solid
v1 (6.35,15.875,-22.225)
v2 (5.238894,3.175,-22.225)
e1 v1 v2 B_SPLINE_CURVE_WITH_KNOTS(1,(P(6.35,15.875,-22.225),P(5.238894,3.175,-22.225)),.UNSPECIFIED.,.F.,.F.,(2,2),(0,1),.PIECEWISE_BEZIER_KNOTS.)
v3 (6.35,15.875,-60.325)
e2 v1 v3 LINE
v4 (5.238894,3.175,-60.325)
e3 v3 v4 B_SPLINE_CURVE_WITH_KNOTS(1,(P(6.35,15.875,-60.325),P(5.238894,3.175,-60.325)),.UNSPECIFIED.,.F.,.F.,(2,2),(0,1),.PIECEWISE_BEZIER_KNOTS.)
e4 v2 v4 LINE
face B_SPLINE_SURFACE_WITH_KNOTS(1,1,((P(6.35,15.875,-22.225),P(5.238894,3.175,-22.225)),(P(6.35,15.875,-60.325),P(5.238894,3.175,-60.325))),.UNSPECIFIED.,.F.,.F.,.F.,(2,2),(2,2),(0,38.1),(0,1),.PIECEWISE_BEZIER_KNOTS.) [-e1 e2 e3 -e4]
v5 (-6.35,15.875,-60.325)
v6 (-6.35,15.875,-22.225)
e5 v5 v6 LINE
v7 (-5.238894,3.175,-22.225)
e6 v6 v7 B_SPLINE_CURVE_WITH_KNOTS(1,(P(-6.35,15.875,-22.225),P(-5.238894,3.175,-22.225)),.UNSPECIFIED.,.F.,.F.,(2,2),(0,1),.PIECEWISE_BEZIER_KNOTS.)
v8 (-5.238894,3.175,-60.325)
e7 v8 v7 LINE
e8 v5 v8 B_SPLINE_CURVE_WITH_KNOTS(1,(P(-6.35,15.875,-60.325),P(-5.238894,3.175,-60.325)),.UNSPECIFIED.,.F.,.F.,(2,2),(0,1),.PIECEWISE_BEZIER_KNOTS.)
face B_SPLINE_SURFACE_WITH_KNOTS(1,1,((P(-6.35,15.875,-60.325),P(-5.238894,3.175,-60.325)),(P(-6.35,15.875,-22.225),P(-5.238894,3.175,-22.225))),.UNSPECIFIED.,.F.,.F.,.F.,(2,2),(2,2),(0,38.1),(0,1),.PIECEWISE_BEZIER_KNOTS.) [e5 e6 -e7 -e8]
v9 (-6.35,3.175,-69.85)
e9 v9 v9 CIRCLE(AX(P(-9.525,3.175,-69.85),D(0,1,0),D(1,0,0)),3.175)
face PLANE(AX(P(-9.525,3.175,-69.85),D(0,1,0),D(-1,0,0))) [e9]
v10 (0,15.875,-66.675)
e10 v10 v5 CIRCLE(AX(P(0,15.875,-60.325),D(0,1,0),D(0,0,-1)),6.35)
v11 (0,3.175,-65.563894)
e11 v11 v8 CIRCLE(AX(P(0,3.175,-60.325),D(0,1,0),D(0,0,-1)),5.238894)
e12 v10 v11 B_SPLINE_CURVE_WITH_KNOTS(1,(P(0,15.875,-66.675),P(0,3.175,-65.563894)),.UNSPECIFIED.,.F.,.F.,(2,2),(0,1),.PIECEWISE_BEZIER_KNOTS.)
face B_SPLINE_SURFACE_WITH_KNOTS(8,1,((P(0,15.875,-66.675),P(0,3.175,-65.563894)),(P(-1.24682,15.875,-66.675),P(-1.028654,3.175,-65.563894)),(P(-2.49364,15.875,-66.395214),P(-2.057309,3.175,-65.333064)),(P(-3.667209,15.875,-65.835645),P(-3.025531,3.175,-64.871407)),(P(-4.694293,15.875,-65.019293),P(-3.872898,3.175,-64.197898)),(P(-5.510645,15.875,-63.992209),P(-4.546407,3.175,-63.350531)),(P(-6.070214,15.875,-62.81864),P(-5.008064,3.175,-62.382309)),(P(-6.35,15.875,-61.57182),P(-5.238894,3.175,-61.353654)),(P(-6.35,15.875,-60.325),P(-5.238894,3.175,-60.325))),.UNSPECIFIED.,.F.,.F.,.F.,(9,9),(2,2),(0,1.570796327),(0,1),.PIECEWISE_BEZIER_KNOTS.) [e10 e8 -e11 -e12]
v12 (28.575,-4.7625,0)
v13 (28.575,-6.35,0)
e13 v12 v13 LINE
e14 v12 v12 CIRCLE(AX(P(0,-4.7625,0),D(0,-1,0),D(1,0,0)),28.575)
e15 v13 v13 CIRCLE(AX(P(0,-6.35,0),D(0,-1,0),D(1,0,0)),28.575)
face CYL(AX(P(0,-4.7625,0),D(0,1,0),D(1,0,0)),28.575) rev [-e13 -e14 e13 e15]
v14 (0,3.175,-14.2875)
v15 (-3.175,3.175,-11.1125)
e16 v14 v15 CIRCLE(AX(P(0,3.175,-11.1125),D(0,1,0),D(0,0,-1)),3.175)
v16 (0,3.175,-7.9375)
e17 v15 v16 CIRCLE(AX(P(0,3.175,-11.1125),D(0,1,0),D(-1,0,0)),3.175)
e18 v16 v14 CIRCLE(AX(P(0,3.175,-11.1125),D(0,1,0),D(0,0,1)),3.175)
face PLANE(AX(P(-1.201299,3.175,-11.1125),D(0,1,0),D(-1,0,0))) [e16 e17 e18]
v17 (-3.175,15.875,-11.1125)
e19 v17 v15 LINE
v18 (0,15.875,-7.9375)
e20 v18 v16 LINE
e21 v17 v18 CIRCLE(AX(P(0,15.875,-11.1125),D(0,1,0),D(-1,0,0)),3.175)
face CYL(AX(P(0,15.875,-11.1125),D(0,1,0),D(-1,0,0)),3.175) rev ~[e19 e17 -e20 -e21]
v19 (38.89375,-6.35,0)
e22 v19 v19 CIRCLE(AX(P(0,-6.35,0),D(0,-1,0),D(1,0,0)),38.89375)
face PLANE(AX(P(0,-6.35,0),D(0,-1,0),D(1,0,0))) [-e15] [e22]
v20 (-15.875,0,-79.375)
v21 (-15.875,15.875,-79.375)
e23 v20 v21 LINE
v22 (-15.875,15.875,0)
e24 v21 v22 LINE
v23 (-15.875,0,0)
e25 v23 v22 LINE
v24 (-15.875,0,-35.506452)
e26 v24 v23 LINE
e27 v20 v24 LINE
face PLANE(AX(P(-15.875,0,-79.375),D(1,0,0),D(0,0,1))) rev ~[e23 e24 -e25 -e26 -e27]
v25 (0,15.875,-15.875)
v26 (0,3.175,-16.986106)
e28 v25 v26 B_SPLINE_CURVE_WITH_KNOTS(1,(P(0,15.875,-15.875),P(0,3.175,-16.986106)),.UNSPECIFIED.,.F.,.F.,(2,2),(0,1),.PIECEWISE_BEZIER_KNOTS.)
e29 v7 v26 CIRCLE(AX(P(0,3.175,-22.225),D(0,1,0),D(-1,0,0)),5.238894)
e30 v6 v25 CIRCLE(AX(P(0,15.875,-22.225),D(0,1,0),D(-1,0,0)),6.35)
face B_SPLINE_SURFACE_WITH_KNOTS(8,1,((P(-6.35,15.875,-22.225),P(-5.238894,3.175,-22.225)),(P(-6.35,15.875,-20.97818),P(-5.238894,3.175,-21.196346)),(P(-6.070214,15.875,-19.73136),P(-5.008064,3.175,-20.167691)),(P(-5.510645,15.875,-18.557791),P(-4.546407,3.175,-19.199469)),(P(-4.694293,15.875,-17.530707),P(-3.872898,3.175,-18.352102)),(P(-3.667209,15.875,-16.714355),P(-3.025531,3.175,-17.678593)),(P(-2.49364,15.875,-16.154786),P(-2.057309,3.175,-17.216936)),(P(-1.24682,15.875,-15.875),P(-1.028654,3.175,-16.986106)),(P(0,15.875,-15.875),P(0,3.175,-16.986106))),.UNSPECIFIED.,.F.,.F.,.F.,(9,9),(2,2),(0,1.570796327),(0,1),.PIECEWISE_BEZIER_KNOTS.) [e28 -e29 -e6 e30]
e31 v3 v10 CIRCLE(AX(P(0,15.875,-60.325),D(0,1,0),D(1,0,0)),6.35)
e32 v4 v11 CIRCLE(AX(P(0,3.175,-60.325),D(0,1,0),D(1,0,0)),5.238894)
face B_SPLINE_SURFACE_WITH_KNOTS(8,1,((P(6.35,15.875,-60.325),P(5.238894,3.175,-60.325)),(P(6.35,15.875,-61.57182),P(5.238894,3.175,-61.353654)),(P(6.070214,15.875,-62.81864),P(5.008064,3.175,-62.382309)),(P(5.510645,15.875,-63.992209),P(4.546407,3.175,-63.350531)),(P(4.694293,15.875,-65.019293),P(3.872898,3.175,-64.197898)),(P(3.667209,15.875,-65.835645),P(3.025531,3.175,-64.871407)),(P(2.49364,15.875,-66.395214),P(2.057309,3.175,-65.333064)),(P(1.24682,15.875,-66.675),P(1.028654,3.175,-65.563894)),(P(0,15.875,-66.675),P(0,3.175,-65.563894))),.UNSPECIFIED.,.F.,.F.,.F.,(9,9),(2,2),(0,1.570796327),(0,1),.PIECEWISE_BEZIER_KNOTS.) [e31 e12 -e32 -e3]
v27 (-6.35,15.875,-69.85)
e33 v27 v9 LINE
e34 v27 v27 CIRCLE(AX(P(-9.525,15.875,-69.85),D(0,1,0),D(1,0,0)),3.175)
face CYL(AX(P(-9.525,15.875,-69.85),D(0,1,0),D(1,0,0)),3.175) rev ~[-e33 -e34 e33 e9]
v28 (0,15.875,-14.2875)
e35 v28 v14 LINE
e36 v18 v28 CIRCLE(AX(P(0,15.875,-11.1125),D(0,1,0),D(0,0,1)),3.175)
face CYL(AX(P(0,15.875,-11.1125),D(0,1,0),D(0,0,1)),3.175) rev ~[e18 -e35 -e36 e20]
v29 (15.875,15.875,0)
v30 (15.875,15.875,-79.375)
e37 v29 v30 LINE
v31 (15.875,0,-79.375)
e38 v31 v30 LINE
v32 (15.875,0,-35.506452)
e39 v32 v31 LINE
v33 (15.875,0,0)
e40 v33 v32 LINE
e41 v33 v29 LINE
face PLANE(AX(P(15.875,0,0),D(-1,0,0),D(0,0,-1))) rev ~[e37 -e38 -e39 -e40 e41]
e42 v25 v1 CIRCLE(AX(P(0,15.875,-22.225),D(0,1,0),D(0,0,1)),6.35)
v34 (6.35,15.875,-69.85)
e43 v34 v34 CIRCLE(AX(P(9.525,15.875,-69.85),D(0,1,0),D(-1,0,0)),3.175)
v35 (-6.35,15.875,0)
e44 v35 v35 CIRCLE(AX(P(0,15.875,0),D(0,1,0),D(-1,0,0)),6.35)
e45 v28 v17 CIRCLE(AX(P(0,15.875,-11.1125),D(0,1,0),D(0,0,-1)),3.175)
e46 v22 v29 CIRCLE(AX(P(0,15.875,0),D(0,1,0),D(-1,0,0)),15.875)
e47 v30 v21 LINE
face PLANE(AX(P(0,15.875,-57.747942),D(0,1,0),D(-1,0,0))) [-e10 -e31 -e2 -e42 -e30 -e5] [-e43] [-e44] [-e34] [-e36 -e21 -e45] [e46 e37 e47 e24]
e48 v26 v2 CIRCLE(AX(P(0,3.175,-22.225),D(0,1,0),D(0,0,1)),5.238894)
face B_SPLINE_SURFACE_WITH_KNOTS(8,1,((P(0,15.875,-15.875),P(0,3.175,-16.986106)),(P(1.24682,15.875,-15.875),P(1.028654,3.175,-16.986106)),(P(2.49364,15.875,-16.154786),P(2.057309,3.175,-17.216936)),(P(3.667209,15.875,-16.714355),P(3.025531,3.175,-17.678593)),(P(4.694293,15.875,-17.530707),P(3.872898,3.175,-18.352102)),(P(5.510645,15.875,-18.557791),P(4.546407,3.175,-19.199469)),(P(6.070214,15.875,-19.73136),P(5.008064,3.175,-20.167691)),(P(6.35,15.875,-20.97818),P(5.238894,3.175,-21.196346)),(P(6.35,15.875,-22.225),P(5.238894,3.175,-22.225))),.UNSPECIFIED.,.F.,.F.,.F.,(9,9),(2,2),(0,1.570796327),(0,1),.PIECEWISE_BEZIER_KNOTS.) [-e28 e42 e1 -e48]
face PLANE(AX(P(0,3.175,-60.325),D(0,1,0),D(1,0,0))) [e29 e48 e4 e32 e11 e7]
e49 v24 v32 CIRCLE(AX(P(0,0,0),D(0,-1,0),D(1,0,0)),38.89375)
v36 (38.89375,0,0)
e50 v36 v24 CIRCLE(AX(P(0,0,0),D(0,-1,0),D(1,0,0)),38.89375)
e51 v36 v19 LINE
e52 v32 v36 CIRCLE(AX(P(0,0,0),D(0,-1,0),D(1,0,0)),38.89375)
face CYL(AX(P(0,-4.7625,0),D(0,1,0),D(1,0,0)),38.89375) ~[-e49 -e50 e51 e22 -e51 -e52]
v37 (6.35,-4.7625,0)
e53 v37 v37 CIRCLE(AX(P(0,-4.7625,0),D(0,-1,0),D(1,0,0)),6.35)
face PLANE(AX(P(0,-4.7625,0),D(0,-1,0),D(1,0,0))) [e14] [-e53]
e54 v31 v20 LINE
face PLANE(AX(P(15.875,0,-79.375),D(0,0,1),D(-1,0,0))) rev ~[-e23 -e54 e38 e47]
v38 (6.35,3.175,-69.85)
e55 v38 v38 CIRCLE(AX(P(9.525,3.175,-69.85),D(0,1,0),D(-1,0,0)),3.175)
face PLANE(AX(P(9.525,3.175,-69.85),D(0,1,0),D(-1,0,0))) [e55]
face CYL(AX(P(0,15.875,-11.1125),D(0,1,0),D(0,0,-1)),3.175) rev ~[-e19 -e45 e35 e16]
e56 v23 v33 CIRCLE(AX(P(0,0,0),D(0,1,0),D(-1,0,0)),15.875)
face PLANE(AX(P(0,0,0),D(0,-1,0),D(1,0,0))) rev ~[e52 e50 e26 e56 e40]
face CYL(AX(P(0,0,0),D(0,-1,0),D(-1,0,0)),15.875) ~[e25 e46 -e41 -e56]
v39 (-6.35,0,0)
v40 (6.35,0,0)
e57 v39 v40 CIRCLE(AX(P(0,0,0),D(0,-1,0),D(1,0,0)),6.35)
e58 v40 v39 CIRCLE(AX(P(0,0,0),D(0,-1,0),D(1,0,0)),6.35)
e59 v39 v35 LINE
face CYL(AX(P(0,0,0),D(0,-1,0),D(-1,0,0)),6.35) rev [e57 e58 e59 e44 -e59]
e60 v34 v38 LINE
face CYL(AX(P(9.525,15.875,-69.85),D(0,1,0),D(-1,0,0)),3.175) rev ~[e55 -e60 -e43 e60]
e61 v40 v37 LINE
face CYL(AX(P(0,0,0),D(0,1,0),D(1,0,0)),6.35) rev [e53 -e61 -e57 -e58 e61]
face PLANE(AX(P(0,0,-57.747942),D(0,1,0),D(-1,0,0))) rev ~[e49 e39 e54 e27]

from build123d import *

# Parameters (mm, degrees)
F0_R     = 38.89375
F0_R_2   = 6.35
F1_DEPTH = 4.7625
F2_R     = 38.89375
F2_R_2   = 28.575
F3_DEPTH = 1.5875
F4_R     = 6.35
F5_DEPTH = 15.875
F7_DEPTH = 12.7
F7_TAPER = 5
F8_R     = 3.175
F9_DEPTH = 12.7


with BuildPart() as f1:
    # F0 (on Front) → F1 (new body)
    with BuildSketch(Plane.XZ):
        Circle(F0_R)
        Circle(F0_R_2, mode=Mode.SUBTRACT)
    extrude(amount=F1_DEPTH)

    # F2 (on face) → F3 (join)
    with BuildSketch(Plane.XZ.offset(4.7625)):
        Circle(F2_R)
        Circle(F2_R_2, mode=Mode.SUBTRACT)
    extrude(amount=F3_DEPTH)

    # F4 (on face) → F5 (join)
    with BuildSketch(Plane(origin=(0, 0, 0), x_dir=(-1, 0, 0), z_dir=(0, 1, 0))):
        with BuildLine():
            Line((-15.875, -79.375), (15.875, -79.375))
            Line((15.875, -79.375), (15.875, -35.5064524286))
            ThreePointArc((15.875, -35.5064524286), (0, -38.89375), (-15.875, -35.5064524286))
            Line((-15.875, -35.5064524286), (-15.875, -79.375))
        make_face()
        with BuildLine():
            ThreePointArc((-15.875, -35.5064524286), (0, -38.89375), (15.875, -35.5064524286))
            Line((15.875, -35.5064524286), (15.875, 0))
            ThreePointArc((15.875, 0), (4.9e-09, -15.875), (-15.875, -9.8e-09))
            Line((-15.875, -9.8e-09), (-15.875, -35.5064524286))
        make_face()
        with BuildLine():
            ThreePointArc((-15.875, -9.8e-09), (4.9e-09, -15.875), (15.875, 0))
            ThreePointArc((15.875, 0), (-4.9e-09, 15.875), (-15.875, -9.8e-09))
        make_face()
        Circle(F4_R, mode=Mode.SUBTRACT)
    extrude(amount=F5_DEPTH)

    # F6 (on face) → F7 (cut)
    with BuildSketch(Plane(origin=(0, 15.875, 0), x_dir=(-1, 0, 0), z_dir=(0, 1, 0))):
        with BuildLine():
            ThreePointArc((-6.35, -60.325), (-4.4901280605, -64.8151280605), (0, -66.675))
            Line((0, -66.675), (0, -60.325))
            Line((0, -60.325), (-6.35, -60.325))
        make_face()
        with BuildLine():
            Line((0, -60.325), (0, -66.675))
            ThreePointArc((0, -66.675), (4.4901280605, -64.8151280605), (6.35, -60.325))
            Line((6.35, -60.325), (0, -60.325))
        make_face()
        with BuildLine():
            Line((-6.35, -60.325), (0, -60.325))
            Line((0, -60.325), (0, -53.975))
            ThreePointArc((0, -53.975), (-4.4901280605, -55.8348719395), (-6.35, -60.325))
        make_face()
        with BuildLine():
            Line((0, -53.975), (0, -60.325))
            Line((0, -60.325), (6.35, -60.325))
            ThreePointArc((6.35, -60.325), (4.4901280605, -55.8348719395), (0, -53.975))
        make_face()
        with BuildLine():
            Line((-6.35, -22.225), (-6.35, -60.325))
            ThreePointArc((-6.35, -60.325), (-4.4901280605, -55.8348719395), (0, -53.975))
            Line((0, -53.975), (0, -28.575))
            ThreePointArc((0, -28.575), (-4.4901280605, -26.7151280605), (-6.35, -22.225))
        make_face()
        with BuildLine():
            ThreePointArc((0, -53.975), (4.4901280605, -55.8348719395), (6.35, -60.325))
            Line((6.35, -60.325), (6.35, -22.225))
            ThreePointArc((6.35, -22.225), (4.4901280605, -26.7151280605), (0, -28.575))
            Line((0, -28.575), (0, -53.975))
        make_face()
        with BuildLine():
            ThreePointArc((0, -15.875), (-4.4901280605, -17.7348719395), (-6.35, -22.225))
            Line((-6.35, -22.225), (0, -22.225))
            Line((0, -22.225), (0, -15.875))
        make_face()
        with BuildLine():
            Line((0, -22.225), (-6.35, -22.225))
            ThreePointArc((-6.35, -22.225), (-4.4901280605, -26.7151280605), (0, -28.575))
            Line((0, -28.575), (0, -22.225))
        make_face()
        with BuildLine():
            ThreePointArc((0, -28.575), (4.4901280605, -26.7151280605), (6.35, -22.225))
            Line((6.35, -22.225), (0, -22.225))
            Line((0, -22.225), (0, -28.575))
        make_face()
        with BuildLine():
            Line((0, -22.225), (6.35, -22.225))
            ThreePointArc((6.35, -22.225), (4.4901280605, -17.7348719395), (0, -15.875))
            Line((0, -15.875), (0, -22.225))
        make_face()
    extrude(amount=-F7_DEPTH, taper=F7_TAPER, mode=Mode.SUBTRACT)

    # F8 (on face) → F9 (cut)
    with BuildSketch(Plane(origin=(0, 15.875, 0), x_dir=(-1, 0, 0), z_dir=(0, 1, 0))):
        with BuildLine():
            ThreePointArc((3.175, -11.1125), (2.2450640303, -8.8674359697), (0, -7.9375))
            Line((0, -7.9375), (0, -14.2875))
            ThreePointArc((0, -14.2875), (2.2450640303, -13.3575640303), (3.175, -11.1125))
        make_face()
        with BuildLine():
            ThreePointArc((12.7, -69.85), (9.525, -66.675), (6.35, -69.85))
            ThreePointArc((6.35, -69.85), (9.525, -73.025), (12.7, -69.85))
        make_face()
        with Locations((-9.525, -69.85)):
            Circle(F8_R)
        with BuildLine():
            Line((0, -14.2875), (0, -7.9375))
            ThreePointArc((0, -7.9375), (-3.175, -11.1125), (0, -14.2875))
        make_face()
    extrude(amount=-F9_DEPTH, mode=Mode.SUBTRACT)


solid = f1.part
